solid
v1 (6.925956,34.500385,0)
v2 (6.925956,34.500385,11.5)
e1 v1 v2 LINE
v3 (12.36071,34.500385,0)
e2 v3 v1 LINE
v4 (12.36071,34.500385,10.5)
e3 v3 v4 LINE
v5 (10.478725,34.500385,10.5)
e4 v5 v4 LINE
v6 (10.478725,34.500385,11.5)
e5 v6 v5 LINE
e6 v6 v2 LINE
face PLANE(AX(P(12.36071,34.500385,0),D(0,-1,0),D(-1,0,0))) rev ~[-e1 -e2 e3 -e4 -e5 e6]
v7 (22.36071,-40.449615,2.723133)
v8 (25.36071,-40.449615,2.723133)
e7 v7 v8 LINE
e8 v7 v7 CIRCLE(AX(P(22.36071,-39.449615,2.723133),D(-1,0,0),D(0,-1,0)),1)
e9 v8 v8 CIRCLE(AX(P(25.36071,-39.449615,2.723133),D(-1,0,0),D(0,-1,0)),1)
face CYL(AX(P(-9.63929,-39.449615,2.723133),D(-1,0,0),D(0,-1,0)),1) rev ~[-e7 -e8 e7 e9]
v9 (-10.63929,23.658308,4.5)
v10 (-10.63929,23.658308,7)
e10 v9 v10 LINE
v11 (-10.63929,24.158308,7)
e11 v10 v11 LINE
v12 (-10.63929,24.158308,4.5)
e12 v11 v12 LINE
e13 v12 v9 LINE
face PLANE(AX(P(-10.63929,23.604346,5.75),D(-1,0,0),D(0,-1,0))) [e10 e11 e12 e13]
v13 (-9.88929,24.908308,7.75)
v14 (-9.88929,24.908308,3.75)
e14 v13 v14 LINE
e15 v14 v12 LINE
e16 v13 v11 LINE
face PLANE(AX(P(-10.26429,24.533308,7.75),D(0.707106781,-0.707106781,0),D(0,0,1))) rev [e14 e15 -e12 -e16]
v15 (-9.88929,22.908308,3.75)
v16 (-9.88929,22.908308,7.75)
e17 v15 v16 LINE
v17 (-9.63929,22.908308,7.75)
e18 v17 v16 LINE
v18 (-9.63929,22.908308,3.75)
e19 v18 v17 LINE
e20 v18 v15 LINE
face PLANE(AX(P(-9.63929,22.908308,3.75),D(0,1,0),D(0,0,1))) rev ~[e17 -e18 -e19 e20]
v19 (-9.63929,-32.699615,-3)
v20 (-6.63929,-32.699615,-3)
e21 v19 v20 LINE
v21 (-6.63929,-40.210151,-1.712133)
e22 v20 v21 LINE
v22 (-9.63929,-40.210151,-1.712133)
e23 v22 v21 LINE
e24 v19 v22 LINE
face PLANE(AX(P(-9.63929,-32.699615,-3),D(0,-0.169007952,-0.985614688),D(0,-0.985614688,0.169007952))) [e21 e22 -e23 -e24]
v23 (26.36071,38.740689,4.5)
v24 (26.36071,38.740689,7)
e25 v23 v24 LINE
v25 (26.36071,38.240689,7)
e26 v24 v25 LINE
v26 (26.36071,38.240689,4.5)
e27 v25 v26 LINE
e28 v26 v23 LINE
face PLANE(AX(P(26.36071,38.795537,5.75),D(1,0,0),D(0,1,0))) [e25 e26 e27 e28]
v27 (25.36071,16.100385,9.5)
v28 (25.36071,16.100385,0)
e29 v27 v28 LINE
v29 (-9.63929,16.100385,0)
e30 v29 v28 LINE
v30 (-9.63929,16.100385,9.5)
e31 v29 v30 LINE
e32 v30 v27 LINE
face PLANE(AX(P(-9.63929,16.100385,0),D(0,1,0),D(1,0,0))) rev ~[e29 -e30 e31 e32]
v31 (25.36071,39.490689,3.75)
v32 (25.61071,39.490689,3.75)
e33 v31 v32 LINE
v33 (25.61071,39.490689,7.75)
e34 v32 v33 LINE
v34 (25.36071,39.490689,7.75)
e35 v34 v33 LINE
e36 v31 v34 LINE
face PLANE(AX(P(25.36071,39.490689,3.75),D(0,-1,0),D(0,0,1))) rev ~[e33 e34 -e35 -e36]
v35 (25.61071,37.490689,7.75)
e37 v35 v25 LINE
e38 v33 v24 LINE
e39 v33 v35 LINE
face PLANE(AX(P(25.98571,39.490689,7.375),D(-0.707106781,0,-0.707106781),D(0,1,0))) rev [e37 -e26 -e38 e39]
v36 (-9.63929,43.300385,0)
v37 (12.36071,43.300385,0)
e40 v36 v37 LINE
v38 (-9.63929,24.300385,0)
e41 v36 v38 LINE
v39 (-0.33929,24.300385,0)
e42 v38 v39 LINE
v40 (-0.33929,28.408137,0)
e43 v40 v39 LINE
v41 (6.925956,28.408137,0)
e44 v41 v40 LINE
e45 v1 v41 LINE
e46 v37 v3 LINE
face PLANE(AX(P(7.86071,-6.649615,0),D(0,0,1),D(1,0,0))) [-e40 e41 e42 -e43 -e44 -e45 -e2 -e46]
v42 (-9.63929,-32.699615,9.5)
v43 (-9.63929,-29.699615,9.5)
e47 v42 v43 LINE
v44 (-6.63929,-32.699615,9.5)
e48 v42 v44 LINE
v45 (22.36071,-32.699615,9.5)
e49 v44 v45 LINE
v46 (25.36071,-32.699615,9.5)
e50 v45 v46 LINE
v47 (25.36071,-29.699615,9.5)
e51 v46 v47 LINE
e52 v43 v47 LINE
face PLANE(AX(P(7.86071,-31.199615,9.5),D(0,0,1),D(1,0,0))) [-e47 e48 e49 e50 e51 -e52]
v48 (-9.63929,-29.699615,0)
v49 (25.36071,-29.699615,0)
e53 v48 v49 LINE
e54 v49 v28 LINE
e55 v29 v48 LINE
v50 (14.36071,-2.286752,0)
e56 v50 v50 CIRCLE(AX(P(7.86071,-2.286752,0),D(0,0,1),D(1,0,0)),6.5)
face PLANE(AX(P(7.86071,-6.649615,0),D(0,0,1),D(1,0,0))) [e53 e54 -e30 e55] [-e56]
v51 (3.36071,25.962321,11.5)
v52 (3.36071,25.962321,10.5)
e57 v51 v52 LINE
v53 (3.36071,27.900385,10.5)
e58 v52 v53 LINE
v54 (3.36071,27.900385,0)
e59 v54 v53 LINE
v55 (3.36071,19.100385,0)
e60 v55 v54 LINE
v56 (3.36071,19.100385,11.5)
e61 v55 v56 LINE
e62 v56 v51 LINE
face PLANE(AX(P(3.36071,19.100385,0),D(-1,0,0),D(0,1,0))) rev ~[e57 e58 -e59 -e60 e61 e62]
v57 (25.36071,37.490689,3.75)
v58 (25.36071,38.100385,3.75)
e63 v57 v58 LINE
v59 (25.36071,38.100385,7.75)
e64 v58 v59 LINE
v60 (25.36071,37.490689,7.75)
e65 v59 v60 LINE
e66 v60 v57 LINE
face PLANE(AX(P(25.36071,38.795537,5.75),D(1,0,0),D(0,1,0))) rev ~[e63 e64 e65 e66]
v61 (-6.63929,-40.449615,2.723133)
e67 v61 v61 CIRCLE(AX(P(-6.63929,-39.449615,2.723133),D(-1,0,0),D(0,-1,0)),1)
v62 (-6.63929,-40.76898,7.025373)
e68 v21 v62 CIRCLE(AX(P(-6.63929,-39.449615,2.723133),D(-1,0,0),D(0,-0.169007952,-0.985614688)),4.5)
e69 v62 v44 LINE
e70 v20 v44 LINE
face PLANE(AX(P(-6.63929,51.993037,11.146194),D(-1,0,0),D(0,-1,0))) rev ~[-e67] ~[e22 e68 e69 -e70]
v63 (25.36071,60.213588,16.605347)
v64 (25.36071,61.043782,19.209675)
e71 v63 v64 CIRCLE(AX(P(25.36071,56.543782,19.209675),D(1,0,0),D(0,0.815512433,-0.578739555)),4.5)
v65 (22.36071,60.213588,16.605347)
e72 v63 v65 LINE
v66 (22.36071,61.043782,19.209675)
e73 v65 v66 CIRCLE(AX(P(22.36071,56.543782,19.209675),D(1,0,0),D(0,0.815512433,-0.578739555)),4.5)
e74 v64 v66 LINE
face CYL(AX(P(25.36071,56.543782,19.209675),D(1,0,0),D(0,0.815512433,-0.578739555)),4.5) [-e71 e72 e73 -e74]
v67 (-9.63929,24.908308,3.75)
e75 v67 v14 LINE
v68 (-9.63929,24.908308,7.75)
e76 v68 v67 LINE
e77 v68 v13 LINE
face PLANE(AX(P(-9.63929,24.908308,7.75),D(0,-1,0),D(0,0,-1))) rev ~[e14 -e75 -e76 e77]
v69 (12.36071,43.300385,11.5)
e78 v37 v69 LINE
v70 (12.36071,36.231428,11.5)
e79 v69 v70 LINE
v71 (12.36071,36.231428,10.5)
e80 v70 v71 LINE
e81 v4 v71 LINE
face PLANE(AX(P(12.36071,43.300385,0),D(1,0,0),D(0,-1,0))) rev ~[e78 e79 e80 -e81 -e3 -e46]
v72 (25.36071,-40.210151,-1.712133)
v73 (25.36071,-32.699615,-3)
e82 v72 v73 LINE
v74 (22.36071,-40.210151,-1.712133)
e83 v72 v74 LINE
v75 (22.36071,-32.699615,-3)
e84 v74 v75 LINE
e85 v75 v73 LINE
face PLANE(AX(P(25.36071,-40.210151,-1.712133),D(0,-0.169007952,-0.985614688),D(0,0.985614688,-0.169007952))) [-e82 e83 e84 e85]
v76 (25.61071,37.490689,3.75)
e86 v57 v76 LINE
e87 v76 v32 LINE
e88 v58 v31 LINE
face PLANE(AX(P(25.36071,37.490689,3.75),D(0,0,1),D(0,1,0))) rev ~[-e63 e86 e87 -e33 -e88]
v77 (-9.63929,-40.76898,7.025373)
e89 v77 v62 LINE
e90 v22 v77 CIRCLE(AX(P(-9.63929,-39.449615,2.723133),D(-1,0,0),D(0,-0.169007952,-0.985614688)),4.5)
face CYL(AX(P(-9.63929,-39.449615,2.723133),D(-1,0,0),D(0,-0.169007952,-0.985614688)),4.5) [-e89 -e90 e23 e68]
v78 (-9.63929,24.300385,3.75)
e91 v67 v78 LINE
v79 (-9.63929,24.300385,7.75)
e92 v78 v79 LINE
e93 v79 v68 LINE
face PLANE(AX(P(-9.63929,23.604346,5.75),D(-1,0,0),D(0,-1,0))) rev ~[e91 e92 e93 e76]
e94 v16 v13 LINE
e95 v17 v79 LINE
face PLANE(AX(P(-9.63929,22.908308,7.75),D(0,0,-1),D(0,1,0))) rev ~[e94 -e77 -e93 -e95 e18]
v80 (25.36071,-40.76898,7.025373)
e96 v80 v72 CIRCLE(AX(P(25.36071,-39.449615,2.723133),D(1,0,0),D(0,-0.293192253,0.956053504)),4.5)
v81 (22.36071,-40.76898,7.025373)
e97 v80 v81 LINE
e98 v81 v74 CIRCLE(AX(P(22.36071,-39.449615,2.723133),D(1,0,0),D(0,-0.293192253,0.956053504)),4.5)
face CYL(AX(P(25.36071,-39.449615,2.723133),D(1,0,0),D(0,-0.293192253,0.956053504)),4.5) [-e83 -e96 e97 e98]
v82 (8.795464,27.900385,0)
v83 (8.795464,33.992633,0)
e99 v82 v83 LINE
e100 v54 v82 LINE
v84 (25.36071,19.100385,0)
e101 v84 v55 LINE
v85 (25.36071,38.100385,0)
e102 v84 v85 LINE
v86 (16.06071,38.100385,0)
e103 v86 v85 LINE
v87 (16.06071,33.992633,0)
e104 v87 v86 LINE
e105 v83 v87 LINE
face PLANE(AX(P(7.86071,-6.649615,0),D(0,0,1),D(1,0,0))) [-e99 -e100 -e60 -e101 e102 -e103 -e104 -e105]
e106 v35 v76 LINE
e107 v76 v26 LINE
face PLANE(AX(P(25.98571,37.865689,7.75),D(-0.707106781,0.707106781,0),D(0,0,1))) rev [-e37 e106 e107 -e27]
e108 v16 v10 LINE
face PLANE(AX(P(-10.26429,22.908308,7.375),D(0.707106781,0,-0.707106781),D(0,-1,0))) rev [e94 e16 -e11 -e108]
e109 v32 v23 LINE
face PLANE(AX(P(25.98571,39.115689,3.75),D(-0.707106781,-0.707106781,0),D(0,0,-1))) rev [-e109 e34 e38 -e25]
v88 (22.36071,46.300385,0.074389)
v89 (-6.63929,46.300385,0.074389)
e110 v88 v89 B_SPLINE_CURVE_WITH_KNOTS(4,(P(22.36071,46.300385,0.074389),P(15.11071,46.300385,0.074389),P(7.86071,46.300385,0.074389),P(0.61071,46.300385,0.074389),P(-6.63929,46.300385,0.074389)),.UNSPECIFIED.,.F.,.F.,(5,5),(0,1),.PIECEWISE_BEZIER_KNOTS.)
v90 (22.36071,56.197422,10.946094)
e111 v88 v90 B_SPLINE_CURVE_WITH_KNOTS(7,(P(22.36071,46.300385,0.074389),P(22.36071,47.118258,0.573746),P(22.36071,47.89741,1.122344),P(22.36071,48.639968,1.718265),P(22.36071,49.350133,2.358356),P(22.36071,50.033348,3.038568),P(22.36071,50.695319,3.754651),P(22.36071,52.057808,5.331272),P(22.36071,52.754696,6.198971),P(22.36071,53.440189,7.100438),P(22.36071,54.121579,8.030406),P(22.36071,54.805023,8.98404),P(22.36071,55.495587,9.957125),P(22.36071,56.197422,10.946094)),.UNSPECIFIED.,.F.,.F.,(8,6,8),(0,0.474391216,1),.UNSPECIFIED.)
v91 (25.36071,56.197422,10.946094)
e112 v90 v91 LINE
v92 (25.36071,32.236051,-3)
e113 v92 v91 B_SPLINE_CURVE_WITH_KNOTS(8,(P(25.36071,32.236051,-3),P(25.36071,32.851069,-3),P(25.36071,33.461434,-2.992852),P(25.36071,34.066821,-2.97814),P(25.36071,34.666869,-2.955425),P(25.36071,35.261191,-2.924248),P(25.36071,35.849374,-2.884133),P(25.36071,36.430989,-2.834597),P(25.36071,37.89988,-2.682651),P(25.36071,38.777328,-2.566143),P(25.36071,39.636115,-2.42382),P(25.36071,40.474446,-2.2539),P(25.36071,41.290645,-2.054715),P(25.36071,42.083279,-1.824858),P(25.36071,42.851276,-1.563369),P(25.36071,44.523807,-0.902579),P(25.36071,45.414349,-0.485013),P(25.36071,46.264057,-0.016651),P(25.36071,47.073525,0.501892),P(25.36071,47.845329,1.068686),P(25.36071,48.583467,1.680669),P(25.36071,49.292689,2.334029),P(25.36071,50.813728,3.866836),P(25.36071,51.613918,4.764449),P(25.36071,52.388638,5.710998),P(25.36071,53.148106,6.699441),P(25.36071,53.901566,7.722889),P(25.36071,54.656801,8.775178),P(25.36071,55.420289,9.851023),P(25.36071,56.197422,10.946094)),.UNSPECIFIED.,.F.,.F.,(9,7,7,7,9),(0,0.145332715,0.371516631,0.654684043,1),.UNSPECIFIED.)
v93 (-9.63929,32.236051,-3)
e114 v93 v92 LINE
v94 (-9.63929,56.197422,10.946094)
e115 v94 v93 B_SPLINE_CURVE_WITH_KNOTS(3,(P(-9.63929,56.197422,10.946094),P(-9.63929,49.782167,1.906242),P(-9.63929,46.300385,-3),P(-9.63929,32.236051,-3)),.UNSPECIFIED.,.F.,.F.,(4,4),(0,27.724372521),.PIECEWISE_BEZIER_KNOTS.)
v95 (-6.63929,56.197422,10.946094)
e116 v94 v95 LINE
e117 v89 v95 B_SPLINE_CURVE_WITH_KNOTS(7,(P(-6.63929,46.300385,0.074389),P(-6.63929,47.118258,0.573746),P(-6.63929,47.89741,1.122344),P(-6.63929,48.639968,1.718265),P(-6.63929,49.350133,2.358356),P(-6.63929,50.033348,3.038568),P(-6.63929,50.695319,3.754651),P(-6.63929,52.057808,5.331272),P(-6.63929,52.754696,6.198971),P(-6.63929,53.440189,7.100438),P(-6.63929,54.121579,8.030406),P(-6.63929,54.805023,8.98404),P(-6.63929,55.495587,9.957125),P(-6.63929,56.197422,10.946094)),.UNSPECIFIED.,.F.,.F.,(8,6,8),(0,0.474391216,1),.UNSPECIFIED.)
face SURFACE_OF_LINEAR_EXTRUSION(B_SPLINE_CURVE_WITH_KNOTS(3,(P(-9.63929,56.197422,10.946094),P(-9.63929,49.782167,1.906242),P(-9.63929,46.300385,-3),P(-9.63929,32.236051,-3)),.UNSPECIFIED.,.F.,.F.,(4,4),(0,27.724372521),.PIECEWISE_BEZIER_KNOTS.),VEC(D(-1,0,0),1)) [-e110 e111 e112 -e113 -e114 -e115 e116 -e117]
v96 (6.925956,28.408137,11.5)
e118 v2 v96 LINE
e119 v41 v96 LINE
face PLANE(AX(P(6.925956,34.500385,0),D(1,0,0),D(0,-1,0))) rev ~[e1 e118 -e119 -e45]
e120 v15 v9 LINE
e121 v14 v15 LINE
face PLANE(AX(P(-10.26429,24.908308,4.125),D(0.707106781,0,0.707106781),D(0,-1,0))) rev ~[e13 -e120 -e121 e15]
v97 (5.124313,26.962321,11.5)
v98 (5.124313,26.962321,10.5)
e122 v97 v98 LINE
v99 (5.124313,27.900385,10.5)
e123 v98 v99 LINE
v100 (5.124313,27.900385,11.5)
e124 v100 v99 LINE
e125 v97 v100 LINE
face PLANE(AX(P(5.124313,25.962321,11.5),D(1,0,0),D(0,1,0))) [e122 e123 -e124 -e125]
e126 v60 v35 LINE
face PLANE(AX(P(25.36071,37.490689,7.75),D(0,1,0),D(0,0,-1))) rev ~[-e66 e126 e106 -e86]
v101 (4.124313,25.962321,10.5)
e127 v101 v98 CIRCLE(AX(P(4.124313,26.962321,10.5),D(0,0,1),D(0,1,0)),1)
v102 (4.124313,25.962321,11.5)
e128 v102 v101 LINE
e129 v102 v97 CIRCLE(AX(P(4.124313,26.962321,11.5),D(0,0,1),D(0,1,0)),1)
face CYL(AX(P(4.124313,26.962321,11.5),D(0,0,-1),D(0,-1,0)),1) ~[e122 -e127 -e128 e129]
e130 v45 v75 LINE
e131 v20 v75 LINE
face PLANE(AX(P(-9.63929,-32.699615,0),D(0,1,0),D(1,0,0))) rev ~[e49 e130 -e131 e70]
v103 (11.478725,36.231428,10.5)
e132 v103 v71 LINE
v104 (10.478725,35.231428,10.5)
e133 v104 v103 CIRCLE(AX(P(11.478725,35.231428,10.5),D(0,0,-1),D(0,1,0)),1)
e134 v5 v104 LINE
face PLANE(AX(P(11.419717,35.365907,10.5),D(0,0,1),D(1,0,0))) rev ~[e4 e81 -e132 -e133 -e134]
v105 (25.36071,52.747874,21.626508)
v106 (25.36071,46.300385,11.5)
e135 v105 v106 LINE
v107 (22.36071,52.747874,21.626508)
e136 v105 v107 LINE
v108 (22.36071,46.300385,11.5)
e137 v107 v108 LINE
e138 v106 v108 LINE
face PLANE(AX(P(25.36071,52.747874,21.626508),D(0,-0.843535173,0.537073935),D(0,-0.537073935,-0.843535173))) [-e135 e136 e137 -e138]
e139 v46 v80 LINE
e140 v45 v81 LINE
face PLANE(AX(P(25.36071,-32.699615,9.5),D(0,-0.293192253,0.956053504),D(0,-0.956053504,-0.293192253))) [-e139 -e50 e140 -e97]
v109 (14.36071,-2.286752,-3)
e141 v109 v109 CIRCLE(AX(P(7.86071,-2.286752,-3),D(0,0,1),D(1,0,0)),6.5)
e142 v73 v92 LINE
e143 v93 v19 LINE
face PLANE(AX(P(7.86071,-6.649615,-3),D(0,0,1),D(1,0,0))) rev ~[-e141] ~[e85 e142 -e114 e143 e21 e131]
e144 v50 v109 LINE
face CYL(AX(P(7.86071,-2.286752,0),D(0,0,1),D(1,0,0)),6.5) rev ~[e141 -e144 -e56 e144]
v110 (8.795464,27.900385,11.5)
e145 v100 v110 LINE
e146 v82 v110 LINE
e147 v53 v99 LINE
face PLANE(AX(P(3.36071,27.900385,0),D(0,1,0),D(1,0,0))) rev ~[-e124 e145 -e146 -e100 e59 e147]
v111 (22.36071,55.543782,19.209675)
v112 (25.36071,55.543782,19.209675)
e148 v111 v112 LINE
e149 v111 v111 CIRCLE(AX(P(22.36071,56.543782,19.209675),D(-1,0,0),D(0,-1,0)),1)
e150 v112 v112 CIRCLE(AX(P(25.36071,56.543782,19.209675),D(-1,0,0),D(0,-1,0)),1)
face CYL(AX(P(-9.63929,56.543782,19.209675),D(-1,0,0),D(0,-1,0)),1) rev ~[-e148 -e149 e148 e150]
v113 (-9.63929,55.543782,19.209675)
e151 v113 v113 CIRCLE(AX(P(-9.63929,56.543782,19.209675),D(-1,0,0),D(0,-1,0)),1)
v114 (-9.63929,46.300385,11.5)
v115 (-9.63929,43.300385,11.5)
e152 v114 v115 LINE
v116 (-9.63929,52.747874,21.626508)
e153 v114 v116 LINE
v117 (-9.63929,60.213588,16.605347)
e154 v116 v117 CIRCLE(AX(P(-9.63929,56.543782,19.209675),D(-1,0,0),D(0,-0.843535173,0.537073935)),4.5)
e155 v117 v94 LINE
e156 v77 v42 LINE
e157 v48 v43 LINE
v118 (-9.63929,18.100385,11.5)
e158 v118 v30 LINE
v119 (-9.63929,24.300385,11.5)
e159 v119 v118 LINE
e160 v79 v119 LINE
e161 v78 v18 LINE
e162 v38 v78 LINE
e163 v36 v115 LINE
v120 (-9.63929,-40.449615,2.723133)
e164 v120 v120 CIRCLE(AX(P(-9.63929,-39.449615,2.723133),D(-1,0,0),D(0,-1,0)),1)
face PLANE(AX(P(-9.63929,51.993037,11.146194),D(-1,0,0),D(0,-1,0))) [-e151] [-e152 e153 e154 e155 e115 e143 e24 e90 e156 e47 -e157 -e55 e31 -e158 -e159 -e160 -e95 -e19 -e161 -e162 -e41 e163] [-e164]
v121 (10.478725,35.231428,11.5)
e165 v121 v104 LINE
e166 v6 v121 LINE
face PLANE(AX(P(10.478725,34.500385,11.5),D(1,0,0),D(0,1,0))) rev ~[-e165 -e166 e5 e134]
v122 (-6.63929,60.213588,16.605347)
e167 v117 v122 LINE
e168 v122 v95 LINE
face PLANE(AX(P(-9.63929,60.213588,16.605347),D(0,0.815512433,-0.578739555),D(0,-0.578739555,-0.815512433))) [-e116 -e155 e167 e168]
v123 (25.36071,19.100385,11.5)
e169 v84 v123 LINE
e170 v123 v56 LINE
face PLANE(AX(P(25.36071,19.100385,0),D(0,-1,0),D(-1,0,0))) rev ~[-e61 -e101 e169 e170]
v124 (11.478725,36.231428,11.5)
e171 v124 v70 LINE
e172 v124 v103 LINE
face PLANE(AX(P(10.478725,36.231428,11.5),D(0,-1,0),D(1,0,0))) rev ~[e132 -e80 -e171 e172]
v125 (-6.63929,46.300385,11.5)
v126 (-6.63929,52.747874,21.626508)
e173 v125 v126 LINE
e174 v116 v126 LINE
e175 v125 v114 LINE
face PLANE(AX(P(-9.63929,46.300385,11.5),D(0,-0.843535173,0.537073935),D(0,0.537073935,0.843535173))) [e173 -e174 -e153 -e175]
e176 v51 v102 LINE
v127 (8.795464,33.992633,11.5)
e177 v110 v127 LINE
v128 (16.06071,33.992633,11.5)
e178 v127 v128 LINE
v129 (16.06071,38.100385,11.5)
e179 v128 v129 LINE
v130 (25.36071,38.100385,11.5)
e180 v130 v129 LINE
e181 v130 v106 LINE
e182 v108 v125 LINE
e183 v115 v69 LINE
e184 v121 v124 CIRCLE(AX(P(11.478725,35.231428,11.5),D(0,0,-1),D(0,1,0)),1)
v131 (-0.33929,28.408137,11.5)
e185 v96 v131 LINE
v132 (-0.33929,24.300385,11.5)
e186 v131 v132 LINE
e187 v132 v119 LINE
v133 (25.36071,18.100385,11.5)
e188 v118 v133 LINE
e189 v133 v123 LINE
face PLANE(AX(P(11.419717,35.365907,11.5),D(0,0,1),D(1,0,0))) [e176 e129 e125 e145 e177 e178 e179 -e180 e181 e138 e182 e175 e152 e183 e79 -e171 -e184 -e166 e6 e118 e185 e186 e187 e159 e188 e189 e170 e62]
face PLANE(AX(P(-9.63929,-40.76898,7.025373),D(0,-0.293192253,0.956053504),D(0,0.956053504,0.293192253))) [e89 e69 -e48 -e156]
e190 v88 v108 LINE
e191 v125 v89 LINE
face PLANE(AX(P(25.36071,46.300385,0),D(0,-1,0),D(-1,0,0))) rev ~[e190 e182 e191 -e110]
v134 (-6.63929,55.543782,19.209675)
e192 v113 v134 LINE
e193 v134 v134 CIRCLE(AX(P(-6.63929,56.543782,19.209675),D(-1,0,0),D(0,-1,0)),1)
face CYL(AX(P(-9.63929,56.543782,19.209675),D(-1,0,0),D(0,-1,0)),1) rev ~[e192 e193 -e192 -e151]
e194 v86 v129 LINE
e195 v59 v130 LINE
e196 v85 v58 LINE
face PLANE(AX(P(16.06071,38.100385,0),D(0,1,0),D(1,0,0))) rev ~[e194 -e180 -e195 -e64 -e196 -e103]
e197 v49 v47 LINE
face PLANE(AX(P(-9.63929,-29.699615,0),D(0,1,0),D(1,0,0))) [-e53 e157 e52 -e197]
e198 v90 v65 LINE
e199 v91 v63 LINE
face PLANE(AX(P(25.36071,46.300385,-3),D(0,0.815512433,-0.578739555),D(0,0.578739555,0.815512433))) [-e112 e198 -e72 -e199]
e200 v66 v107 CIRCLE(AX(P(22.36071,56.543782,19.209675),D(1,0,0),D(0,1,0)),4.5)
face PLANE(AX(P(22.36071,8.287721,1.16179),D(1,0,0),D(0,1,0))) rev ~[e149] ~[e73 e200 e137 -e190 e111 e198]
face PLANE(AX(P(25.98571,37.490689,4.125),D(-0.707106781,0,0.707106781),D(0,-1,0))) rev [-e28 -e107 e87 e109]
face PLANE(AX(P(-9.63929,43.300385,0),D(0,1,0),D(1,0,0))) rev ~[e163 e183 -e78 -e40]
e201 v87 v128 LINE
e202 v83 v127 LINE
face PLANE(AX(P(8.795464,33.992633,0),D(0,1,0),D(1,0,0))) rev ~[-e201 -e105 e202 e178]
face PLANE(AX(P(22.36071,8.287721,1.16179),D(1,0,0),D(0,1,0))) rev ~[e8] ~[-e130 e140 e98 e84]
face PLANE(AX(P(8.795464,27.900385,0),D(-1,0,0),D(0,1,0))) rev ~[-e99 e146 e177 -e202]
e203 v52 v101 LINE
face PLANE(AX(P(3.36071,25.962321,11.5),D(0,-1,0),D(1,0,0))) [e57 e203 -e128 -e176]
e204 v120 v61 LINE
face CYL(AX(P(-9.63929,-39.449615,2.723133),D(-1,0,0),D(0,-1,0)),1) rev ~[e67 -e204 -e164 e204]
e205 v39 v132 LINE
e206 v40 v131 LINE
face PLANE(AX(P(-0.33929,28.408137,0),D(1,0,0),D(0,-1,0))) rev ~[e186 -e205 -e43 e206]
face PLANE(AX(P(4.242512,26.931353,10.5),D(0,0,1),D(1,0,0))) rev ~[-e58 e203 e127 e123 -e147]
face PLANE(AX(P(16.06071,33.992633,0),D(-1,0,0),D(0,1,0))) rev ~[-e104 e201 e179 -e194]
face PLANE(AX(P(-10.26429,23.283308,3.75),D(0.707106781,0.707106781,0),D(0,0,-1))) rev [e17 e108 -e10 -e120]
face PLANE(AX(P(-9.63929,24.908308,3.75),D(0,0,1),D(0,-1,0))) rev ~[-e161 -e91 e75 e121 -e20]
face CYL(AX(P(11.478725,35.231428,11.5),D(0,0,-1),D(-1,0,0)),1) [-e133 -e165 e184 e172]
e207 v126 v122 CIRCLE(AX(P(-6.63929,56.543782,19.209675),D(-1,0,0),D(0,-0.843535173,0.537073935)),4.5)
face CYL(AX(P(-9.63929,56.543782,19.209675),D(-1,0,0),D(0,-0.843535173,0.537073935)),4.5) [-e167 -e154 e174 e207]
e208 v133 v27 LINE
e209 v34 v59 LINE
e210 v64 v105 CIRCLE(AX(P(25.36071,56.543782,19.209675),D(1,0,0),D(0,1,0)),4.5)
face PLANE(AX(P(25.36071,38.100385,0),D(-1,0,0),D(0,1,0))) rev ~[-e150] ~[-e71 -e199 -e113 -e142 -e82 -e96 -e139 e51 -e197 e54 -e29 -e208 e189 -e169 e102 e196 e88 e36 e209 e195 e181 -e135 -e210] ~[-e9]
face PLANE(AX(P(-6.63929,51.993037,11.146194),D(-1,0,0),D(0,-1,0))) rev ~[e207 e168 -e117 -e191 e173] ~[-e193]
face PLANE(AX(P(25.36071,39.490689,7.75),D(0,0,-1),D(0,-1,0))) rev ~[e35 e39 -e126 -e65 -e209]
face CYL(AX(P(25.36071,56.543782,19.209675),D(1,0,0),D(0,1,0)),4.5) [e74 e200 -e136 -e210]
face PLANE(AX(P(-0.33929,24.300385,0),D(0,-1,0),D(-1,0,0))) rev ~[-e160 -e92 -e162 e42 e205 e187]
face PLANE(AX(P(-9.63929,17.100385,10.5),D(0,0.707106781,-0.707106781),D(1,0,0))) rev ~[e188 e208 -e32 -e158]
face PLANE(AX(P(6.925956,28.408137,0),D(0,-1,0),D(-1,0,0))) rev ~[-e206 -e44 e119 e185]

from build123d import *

# Parameters (mm, degrees)
F0_R      = 6.5
F0_W      = 34.999999702
F0_H      = 3
F0_H_2    = 0.3
F1_DEPTH  = 3
F2_DEPTH  = 9.5
F3_DEPTH  = 11.5
F5_DEPTH  = 3
F7_DEPTH  = 3
F8_R      = 1
F9_DEPTH  = 35.000999702
F11_DEPTH = 1
F13_DEPTH = 1
F14_SIZE  = 0.75
F15_W     = 1.8819853365
F15_H     = 1.731043148
F15_W_2   = 1.7636035271
F15_H_2   = 1.938064149
F16_DEPTH = 1
F18_DEPTH = 36.000999702
F19_R     = 1
F20_SIZE2 = 2
F20_SIZE  = 2


# Not quite as in the source:
# - ends of sketch curves that miss each other by under 0.0002 mm in the source are joined
# - a feature names something its author has since deleted; it is built from what else it names


with BuildPart() as f1:
    # F0 (on Top) → F1 (new body)
    with BuildSketch(Plane.XY):
        Polygon((7.8607099131, 16.1003852367), (-9.6392899379, 16.1003852367), (-9.6392899379, -29.3996147633), (25.3607097641, -29.3996147633), (25.3607097641, 16.1003852367), align=None)
        with Locations((7.8607099131, -2.2867515218)):
            Circle(F0_R, mode=Mode.SUBTRACT)
        with Locations((7.8607099131, -31.1996147633)):
            Rectangle(F0_W, F0_H)
        Polygon((-9.6392899379, 19.1003852367), (-9.6392899379, 16.1003852367), (7.8607099131, 16.1003852367), (25.3607097641, 16.1003852367), (25.3607097641, 19.1003852367), (22.192974557, 19.1003852367), (3.3607097641, 19.1003852367), align=None)
        Polygon((-9.6392899379, 46.3003852367), (-9.6392899379, 43.3003852367), (-6.4715547308, 43.3003852367), (12.3607100621, 43.3003852367), (25.3607097641, 43.3003852367), (25.3607097641, 46.3003852367), align=None)
        with Locations((7.8607099131, -29.5496147633)):
            Rectangle(F0_W, F0_H_2)
        Polygon((16.0607097641, 38.1003852367), (25.3607097641, 38.1003852367), (25.3607097641, 43.3003852367), (12.3607100621, 43.3003852367), (12.3607100621, 35.3003852367), (12.3607100621, 34.5003852367), (7.8607097641, 34.5003852367), (7.8607100621, 33.9926332235), (8.7954637781, 33.9926332235), (16.0607097641, 33.9926332235), align=None)
        Polygon((-9.6392899379, 24.3003852367), (-9.6392899379, 19.1003852367), (3.3607097641, 19.1003852367), (3.3607097641, 27.1003852367), (3.3607097641, 27.9003852367), (7.8607100621, 27.9003852367), (7.8607100621, 28.4081372499), (6.9259563461, 28.4081372499), (-0.3392899379, 28.4081372499), (-0.3392899379, 24.3003852367), align=None)
        Polygon((6.9259563461, 34.5003852367), (6.9259563461, 28.4081372499), (7.8607097641, 28.4081372499), (7.8607100621, 33.9926332235), (7.8607100621, 34.5003852367), align=None)
        Polygon((7.8607100621, 28.4081372499), (7.8607100621, 27.9003852367), (8.7954637781, 27.9003852367), (8.7954637781, 33.9926332235), (7.8607097641, 33.9926332235), align=None)
        Polygon((-9.6392899379, 43.3003852367), (-9.6392899379, 24.3003852367), (-0.3392899379, 24.3003852367), (-0.3392899379, 28.4081372499), (6.9259563461, 28.4081372499), (6.9259563461, 34.5003852367), (7.8607100621, 34.5003852367), (12.3607100621, 34.5003852367), (12.3607100621, 35.3003852367), (12.3607100621, 43.3003852367), (-6.4715547308, 43.3003852367), align=None)
        Polygon((3.3607097641, 27.1003852367), (3.3607097641, 19.1003852367), (22.192974557, 19.1003852367), (25.3607097641, 19.1003852367), (25.3607097641, 38.1003852367), (16.0607097641, 38.1003852367), (16.0607097641, 33.9926332235), (8.7954637781, 33.9926332235), (8.7954637781, 27.9003852367), (7.8607100621, 27.9003852367), (3.3607097641, 27.9003852367), align=None)
    extrude(amount=-F1_DEPTH)

    # F0 (on Top) → F2 (join)
    with BuildSketch(Plane.XY):
        with Locations((7.8607099131, -31.1996147633)):
            Rectangle(F0_W, F0_H)
        Polygon((-9.6392899379, 19.1003852367), (-9.6392899379, 16.1003852367), (7.8607099131, 16.1003852367), (25.3607097641, 16.1003852367), (25.3607097641, 19.1003852367), (22.192974557, 19.1003852367), (3.3607097641, 19.1003852367), align=None)
    extrude(amount=F2_DEPTH)

    # F0 (on Top) → F3 (join)
    with BuildSketch(Plane.XY):
        Polygon((-9.6392899379, 46.3003852367), (-9.6392899379, 43.3003852367), (-6.4715547308, 43.3003852367), (12.3607100621, 43.3003852367), (25.3607097641, 43.3003852367), (25.3607097641, 46.3003852367), align=None)
        Polygon((-9.6392899379, 24.3003852367), (-9.6392899379, 19.1003852367), (3.3607097641, 19.1003852367), (3.3607097641, 27.1003852367), (3.3607097641, 27.9003852367), (7.8607100621, 27.9003852367), (7.8607100621, 28.4081372499), (6.9259563461, 28.4081372499), (-0.3392899379, 28.4081372499), (-0.3392899379, 24.3003852367), align=None)
        Polygon((7.8607100621, 28.4081372499), (7.8607100621, 27.9003852367), (8.7954637781, 27.9003852367), (8.7954637781, 33.9926332235), (7.8607097641, 33.9926332235), align=None)
        Polygon((6.9259563461, 34.5003852367), (6.9259563461, 28.4081372499), (7.8607097641, 28.4081372499), (7.8607100621, 33.9926332235), (7.8607100621, 34.5003852367), align=None)
        Polygon((16.0607097641, 38.1003852367), (25.3607097641, 38.1003852367), (25.3607097641, 43.3003852367), (12.3607100621, 43.3003852367), (12.3607100621, 35.3003852367), (12.3607100621, 34.5003852367), (7.8607097641, 34.5003852367), (7.8607100621, 33.9926332235), (8.7954637781, 33.9926332235), (16.0607097641, 33.9926332235), align=None)
        Polygon((-9.6392899379, 19.1003852367), (-9.6392899379, 16.1003852367), (7.8607099131, 16.1003852367), (25.3607097641, 16.1003852367), (25.3607097641, 19.1003852367), (22.192974557, 19.1003852367), (3.3607097641, 19.1003852367), align=None)
    extrude(amount=F3_DEPTH)

    # F4 (on face) → F5 (join)
    with BuildSketch(Plane.YZ.offset(25.3607097641)):
        Polygon((-32.6996147633, -3), (46.3003852367, -3), (46.3003852367, 11.5), (38.1003852367, 11.5), (38.1003852367, 0), (19.1003852367, 0), (19.1003852367, 11.5), (16.1003852367, 11.5), (16.1003852367, 0), (-29.6996147633, 0), (-29.6996147633, 9.5), (-32.6996147633, 9.5), align=None)
        with BuildLine():
            Line((46.3003852367, 11.5), (46.3003852367, -3))
            Line((46.3003852367, -3), (60.2135883006, 16.6053474951))
            ThreePointArc((60.2135883006, 16.6053474951), (54.0324103863, 15.4756413664), (52.7478740756, 21.6265082006))
            Line((52.7478740756, 21.6265082006), (46.3003852367, 11.5))
        make_face()
        with BuildLine():
            ThreePointArc((52.7478740756, 21.6265082006), (54.0324103863, 15.4756413664), (60.2135883006, 16.6053474951))
            ThreePointArc((60.2135883006, 16.6053474951), (60.8312132136, 17.8429507129), (61.0437823534, 19.2096754909))
            ThreePointArc((61.0437823534, 19.2096754909), (57.8024349564, 23.5300682537), (52.7478740756, 21.6265082006))
        make_face()
        with BuildLine():
            Line((-40.2101505455, -1.7121333681), (-32.6996147633, -3))
            Line((-32.6996147633, -3), (-32.6996147633, 9.5))
            Line((-32.6996147633, 9.5), (-40.7689799002, 7.0253734949))
            ThreePointArc((-40.7689799002, 7.0253734949), (-36.7744645914, 6.3416367755), (-34.9496147633, 2.7231327258))
            ThreePointArc((-34.9496147633, 2.7231327258), (-36.5489606146, -0.7172459612), (-40.2101505455, -1.7121333681))
        make_face()
        with BuildLine():
            ThreePointArc((-40.7689799002, 7.0253734949), (-43.9404391312, 2.4359106929), (-40.2101505455, -1.7121333681))
            ThreePointArc((-40.2101505455, -1.7121333681), (-36.5489606146, -0.7172459612), (-34.9496147633, 2.7231327258))
            ThreePointArc((-34.9496147633, 2.7231327258), (-36.7744645914, 6.3416367755), (-40.7689799002, 7.0253734949))
        make_face()
    extrude(amount=-F5_DEPTH)

    # F6 (on face) → F7 (join)
    with BuildSketch(Plane(origin=(-9.6392899379, 0, 0), x_dir=(0, -1, 0), z_dir=(-1, 0, 0))):
        with BuildLine():
            Line((-60.2135883006, 16.6053474951), (-46.3003852367, -3))
            Line((-46.3003852367, -3), (-46.3003852367, 11.5))
            Line((-46.3003852367, 11.5), (-52.7478740756, 21.6265082006))
            ThreePointArc((-52.7478740756, 21.6265082006), (-59.0551543205, 22.9437096154), (-60.2135883006, 16.6053474951))
        make_face()
        Polygon((-46.3003852367, 11.5), (-46.3003852367, -3), (32.6996147633, -3), (32.6996147633, 9.5), (29.6996147633, 9.5), (29.6996147633, 0), (-16.1003852367, 0), (-16.1003852367, 11.5), (-24.3003852367, 11.5), (-24.3003852367, 0), (-43.3003852367, 0), (-43.3003852367, 11.5), align=None)
        with BuildLine():
            Line((32.6996147633, 9.5), (32.6996147633, -3))
            Line((32.6996147633, -3), (40.2101505455, -1.7121333681))
            ThreePointArc((40.2101505455, -1.7121333681), (43.9404391312, 2.4359106929), (40.7689799002, 7.0253734949))
            Line((40.7689799002, 7.0253734949), (32.6996147633, 9.5))
        make_face()
    extrude(amount=-F7_DEPTH)

    # F8 (on face) → F9 (cut, through all)
    with BuildSketch(Plane(origin=(-9.6392899379, 0, 0), x_dir=(0, -1, 0), z_dir=(-1, 0, 0))):
        with Locations((-56.5437823534, 19.2096754909)):
            Circle(F8_R)
        with Locations((39.4496147633, 2.7231327258)):
            Circle(F8_R)
    extrude(amount=-F9_DEPTH, mode=Mode.SUBTRACT)

    # F10 (on face) → F11 (join)
    with BuildSketch(Plane.YZ.offset(25.3607097641)):
        Polygon((39.4906885922, 7.75), (38.1003852367, 7.75), (38.1003852367, 3.75), (39.4906885922, 3.75), (39.4906885922, 5.75), align=None)
        Polygon((38.1003852367, 3.75), (38.1003852367, 7.75), (37.4906885922, 7.75), (37.4906885922, 5.75), (37.4906885922, 3.75), align=None)
    extrude(amount=F11_DEPTH)

    # F12 (on face) → F13 (join)
    with BuildSketch(Plane(origin=(-9.6392899379, 0, 0), x_dir=(0, -1, 0), z_dir=(-1, 0, 0))):
        Polygon((-22.9083076119, 7.75), (-24.3003852367, 7.75), (-24.3003852367, 3.75), (-22.9083076119, 3.75), (-22.9083076119, 5.75), align=None)
        Polygon((-24.9083076119, 7.75), (-24.9083076119, 5.75), (-24.9083076119, 3.75), (-24.3003852367, 3.75), (-24.3003852367, 7.75), align=None)
    extrude(amount=F13_DEPTH)

    # F14
    f14_edges = [f1.edges().sort_by_distance(p)[0] for p in [
        (-10.63929, 24.908308, 5.75),
        (-10.63929, 22.908308, 5.75),
        (-10.63929, 23.908308, 7.75),
        (-10.63929, 23.908308, 3.75),
        (26.36071, 38.490689, 7.75),
        (26.36071, 37.490689, 5.75),
        (26.36071, 38.490689, 3.75),
        (26.36071, 39.490689, 5.75),
    ]]
    chamfer(f14_edges, length=F14_SIZE)

    # F15 (on face) → F16 (join)
    with BuildSketch(Plane.XY.offset(11.5)):
        with Locations((11.4197173938, 35.3659068108)):
            Rectangle(F15_W, F15_H)
        with Locations((4.2425115276, 26.9313531622)):
            Rectangle(F15_W_2, F15_H_2)
    extrude(amount=-F16_DEPTH)

    # F17 (on face) → F18 (cut, through all)
    with BuildSketch(Plane(origin=(-9.6392899379, 0, 0), x_dir=(0, -1, 0), z_dir=(-1, 0, 0))):
        with BuildLine():
            Line((-56.1974216606, 10.9460940352), (-46.3003852367, -3))
            Line((-46.3003852367, -3), (-32.2360508144, -3))
            add(Edge.make_bspline(
                [(-56.1974216606, 10.9460940352), (-49.7821666885, 1.9062415714), (-46.3003852367, -3), (-32.2360508144, -3)],
                knots=[0, 0, 0, 0, 27.7243725207, 27.7243725207, 27.7243725207, 27.7243725207], degree=3))
        make_face()
    extrude(amount=-F18_DEPTH, mode=Mode.SUBTRACT)

    # F19
    f19_edges = [f1.edges().sort_by_distance(p)[0] for p in [
        (5.124313, 25.962321, 11),
        (10.478725, 36.231428, 11),
    ]]
    fillet(f19_edges, radius=F19_R)

    # F20
    f20_edges = [f1.edges().sort_by_distance(p)[0] for p in [
        (7.86071, 16.100385, 11.5),
    ]]
    chamfer(f20_edges, length=F20_SIZE, length2=F20_SIZE2)


solid = f1.part
